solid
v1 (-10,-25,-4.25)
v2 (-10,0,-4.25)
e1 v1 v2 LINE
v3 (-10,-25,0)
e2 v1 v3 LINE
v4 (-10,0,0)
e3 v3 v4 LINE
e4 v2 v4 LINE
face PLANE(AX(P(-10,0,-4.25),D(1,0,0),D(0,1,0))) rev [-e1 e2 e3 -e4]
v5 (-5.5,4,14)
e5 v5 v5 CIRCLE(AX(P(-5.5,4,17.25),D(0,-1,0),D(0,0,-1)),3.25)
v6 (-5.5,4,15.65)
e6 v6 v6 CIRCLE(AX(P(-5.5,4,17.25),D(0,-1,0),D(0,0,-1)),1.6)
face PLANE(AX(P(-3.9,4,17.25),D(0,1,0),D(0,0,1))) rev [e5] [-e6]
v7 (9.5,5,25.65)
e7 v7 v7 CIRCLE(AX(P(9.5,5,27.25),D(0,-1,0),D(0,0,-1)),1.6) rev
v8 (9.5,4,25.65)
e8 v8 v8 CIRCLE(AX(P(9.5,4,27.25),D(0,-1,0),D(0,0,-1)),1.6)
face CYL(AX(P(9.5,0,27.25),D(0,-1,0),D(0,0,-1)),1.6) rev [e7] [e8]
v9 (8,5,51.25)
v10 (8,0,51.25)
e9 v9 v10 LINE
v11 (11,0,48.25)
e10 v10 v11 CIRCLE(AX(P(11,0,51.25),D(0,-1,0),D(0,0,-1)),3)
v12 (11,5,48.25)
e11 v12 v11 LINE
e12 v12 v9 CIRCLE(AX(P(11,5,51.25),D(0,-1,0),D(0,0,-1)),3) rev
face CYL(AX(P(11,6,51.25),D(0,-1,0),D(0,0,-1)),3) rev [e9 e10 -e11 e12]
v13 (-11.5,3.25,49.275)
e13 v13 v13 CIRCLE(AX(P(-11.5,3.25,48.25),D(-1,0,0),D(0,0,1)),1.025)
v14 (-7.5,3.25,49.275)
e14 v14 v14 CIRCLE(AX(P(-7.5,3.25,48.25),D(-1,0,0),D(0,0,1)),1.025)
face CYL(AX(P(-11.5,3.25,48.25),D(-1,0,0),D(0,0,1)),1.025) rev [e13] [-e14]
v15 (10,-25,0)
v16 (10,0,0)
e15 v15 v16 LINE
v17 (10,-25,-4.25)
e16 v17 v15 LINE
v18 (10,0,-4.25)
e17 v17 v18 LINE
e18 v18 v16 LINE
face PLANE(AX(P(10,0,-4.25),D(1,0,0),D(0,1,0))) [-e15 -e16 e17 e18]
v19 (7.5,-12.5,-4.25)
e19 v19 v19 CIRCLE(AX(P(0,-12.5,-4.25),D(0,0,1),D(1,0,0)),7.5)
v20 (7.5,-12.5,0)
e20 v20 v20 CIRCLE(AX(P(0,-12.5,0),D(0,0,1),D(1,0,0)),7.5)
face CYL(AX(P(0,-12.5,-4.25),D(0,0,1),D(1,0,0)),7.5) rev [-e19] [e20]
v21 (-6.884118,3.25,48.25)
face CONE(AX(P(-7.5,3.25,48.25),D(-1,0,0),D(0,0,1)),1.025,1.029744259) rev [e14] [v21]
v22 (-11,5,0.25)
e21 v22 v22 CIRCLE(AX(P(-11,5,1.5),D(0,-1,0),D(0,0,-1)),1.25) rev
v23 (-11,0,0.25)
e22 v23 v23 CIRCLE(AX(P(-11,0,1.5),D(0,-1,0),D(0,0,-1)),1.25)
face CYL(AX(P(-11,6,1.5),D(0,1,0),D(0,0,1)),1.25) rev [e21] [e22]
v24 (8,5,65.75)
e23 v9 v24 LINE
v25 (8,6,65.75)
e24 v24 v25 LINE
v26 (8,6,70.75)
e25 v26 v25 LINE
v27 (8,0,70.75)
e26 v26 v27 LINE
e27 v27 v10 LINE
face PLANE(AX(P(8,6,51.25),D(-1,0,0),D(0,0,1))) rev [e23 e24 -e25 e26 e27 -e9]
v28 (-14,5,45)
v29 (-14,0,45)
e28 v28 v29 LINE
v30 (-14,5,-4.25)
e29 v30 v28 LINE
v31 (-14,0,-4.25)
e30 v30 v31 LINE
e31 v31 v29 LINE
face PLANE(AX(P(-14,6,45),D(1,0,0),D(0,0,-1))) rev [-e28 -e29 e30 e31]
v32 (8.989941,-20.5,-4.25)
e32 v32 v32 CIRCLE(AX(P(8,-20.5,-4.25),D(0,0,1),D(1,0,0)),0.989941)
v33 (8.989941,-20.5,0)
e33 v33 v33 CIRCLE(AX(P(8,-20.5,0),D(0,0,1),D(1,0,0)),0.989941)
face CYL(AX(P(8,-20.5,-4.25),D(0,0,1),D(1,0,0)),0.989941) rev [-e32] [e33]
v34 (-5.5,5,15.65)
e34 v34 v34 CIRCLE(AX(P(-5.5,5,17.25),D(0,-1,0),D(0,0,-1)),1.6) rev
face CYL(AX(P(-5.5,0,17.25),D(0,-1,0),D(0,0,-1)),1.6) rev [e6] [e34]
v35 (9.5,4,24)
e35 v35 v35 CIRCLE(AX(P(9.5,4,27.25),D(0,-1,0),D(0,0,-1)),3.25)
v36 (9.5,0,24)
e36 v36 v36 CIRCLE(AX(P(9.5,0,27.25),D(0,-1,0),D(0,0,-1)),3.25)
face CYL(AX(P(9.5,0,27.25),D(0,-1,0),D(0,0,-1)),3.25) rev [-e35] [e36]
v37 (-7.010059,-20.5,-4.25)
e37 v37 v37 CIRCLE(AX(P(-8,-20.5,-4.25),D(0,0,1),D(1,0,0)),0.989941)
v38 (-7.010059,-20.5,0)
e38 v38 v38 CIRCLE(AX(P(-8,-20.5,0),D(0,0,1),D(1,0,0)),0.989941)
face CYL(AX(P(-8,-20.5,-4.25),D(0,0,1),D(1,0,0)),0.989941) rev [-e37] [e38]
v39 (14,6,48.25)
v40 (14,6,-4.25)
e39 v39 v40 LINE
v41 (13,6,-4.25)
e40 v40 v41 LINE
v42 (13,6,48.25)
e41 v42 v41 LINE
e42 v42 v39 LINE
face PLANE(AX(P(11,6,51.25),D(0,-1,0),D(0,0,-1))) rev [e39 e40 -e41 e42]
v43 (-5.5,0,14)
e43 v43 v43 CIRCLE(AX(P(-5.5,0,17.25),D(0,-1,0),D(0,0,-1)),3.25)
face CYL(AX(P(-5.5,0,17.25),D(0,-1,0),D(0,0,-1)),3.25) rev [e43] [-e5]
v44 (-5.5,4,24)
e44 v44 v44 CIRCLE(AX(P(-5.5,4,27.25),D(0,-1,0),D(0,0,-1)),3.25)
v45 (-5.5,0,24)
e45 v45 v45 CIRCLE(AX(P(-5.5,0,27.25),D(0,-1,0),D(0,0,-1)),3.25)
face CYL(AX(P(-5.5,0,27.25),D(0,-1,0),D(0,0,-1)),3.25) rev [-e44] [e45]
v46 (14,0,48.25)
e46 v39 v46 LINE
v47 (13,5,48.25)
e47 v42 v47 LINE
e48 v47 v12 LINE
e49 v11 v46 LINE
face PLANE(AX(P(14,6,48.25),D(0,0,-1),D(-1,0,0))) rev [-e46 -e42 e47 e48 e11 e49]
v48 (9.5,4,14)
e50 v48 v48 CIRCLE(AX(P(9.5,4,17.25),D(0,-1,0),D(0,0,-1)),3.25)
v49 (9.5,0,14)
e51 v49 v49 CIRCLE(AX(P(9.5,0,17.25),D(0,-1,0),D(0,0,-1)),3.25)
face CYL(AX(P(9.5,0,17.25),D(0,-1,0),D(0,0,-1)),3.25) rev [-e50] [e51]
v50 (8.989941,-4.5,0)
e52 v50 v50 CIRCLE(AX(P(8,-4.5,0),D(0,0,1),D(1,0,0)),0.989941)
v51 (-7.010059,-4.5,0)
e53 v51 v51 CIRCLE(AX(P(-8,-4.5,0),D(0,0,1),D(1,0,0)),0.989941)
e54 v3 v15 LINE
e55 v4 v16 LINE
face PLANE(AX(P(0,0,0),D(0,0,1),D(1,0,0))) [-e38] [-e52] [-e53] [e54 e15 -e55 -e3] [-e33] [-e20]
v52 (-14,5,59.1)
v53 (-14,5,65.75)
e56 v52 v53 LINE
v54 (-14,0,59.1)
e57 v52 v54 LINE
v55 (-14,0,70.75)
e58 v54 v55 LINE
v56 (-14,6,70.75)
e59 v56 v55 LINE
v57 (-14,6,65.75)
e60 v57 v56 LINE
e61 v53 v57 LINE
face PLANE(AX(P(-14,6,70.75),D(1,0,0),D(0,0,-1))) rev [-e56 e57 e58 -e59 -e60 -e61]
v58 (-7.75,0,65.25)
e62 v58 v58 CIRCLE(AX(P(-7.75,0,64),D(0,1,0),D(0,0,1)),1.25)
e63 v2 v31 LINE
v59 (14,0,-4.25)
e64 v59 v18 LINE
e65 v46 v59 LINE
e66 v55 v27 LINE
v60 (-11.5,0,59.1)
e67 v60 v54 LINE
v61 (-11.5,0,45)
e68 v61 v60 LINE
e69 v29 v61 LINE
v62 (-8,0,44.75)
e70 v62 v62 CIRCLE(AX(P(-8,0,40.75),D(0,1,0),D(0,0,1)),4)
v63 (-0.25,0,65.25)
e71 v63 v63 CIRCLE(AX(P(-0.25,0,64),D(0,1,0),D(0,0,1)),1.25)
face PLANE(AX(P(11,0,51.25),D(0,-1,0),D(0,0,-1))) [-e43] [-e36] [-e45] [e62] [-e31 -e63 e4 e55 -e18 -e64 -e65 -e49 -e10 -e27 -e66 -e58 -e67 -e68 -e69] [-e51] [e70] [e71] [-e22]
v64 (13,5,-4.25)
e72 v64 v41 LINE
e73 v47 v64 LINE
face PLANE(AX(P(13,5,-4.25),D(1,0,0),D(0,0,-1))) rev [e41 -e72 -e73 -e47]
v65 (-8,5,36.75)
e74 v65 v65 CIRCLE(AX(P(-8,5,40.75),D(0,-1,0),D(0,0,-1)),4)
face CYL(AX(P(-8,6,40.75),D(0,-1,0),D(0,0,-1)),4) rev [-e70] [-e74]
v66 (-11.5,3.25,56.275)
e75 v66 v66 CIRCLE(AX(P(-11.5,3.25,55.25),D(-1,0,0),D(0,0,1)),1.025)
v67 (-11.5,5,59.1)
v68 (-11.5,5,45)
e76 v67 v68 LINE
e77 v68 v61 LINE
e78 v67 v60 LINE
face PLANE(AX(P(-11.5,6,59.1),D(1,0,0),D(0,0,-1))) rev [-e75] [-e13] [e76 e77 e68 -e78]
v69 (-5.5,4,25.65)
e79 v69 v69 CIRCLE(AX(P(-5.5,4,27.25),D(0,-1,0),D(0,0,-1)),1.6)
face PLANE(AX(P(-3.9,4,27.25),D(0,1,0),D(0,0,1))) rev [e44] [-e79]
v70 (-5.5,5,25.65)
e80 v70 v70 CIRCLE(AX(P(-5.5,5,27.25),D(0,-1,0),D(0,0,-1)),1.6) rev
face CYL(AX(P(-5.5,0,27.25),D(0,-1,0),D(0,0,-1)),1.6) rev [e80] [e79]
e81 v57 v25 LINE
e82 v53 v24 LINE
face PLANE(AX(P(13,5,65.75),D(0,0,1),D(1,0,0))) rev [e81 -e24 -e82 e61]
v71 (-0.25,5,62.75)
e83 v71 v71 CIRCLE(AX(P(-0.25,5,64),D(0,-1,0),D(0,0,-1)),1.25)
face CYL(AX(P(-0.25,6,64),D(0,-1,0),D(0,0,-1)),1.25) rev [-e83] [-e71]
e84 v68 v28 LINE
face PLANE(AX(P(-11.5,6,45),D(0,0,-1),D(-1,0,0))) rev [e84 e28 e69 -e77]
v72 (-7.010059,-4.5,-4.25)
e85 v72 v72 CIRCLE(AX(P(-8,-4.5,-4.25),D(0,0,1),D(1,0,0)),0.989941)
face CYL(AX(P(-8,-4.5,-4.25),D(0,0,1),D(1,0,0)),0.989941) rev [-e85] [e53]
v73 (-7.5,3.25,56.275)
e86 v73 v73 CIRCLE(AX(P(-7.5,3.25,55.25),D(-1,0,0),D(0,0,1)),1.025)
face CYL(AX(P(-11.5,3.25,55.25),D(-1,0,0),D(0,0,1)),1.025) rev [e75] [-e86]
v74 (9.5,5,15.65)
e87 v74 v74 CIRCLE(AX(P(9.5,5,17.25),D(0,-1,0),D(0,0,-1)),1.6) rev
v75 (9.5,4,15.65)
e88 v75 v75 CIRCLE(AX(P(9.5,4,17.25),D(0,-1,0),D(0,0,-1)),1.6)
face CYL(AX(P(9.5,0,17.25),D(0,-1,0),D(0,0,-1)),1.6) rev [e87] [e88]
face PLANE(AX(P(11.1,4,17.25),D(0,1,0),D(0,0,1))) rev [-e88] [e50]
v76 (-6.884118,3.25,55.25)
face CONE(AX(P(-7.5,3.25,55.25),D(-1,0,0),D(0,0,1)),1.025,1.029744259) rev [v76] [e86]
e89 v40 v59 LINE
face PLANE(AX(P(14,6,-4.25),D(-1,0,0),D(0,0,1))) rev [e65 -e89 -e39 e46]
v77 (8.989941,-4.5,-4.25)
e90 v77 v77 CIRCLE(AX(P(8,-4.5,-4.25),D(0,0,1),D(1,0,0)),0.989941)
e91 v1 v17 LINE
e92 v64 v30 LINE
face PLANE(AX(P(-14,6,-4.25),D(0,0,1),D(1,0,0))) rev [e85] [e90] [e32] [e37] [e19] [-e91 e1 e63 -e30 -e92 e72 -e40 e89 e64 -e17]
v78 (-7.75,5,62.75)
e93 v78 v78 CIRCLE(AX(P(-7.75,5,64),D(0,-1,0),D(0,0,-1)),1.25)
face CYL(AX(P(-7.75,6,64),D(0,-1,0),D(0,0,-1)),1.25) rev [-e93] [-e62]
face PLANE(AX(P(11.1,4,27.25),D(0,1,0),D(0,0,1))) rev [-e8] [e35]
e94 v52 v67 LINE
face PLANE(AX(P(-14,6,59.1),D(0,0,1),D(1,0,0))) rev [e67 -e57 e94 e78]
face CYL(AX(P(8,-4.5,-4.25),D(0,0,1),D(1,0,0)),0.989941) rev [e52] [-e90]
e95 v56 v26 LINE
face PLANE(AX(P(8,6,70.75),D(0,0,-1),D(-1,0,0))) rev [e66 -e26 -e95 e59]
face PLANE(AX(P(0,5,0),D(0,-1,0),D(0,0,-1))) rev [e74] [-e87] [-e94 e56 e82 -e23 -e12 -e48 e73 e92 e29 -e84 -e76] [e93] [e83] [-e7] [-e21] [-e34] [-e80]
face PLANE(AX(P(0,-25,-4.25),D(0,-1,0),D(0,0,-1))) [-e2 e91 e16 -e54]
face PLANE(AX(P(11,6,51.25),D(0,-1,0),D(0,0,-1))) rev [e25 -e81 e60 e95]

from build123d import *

# Parameters (mm, degrees)
BACK_SKETCH_R                                  = 0.8
BACK_SKETCH_R_2                                = 4
BACK_SKETCH_R_3                                = 1.25
BACK_EXTRUDE_DEPTH                             = 6
BOTTOM_SKETCH_W                                = 20
BOTTOM_SKETCH_H                                = 25
BOTTOM_SKETCH_R                                = 0.989941464
BOTTOM_SKETCH_R_2                              = 7.5
BOTTOM_EXTRUDE_DEPTH                           = 4.25
CARRAIGE_MOUNT_M3S_D                           = 3.2
CARRAIGE_MOUNT_M3S_CBORE_D                     = 6.5
CARRAIGE_MOUNT_M3S_CBORE_DEPTH                 = 4
ROTATIONAL_SENSOR_TAPPED_HOLES_M2_5X0_45_D     = 2.05
ROTATIONAL_SENSOR_TAPPED_HOLES_M2_5X0_45_DEPTH = 4
ROTATIONAL_SENSOR_TAPPED_HOLES_M2_5X0_45_TIP   = 0.615882135
M3X0_5_TAPPED_HOLE1_D                          = 2.5
SKETCH5_W                                      = 27
SKETCH5_H                                      = 70
BACK_RECESS_CUT_DEPTH                          = 1


with BuildPart() as part:
    # Back Sketch → Back Extrude (new body)
    with BuildSketch(Plane(origin=(0, 0, 0), x_dir=(1, 0, 0), z_dir=(0, 1, 0))):
        with BuildLine():
            Line((14, 4.25), (14, -48.25))
            Line((14, -48.25), (11, -48.25))
            ThreePointArc((11, -48.25), (8.878679656, -49.128679656), (8, -51.25))
            Line((8, -51.25), (8, -70.75))
            Line((8, -70.75), (-14, -70.75))
            Line((-14, -70.75), (-14, -59.1))
            Line((-14, -59.1), (-11.5, -59.1))
            Line((-11.5, -59.1), (-11.5, -45))
            Line((-11.5, -45), (-14, -45))
            Line((-14, -45), (-14, 4.25))
            Line((-14, 4.25), (14, 4.25))
        make_face()
        with Locations((9.5, -17.25)):
            Circle(BACK_SKETCH_R, mode=Mode.SUBTRACT)
        with Locations((-5.5, -17.25)):
            Circle(BACK_SKETCH_R, mode=Mode.SUBTRACT)
        with Locations((-5.5, -27.25)):
            Circle(BACK_SKETCH_R, mode=Mode.SUBTRACT)
        with Locations((9.5, -27.25)):
            Circle(BACK_SKETCH_R, mode=Mode.SUBTRACT)
        with Locations((-8, -40.75)):
            Circle(BACK_SKETCH_R_2, mode=Mode.SUBTRACT)
        with Locations((-7.75, -64)):
            Circle(BACK_SKETCH_R_3, mode=Mode.SUBTRACT)
        with Locations((-0.25, -64)):
            Circle(BACK_SKETCH_R_3, mode=Mode.SUBTRACT)
    extrude(amount=BACK_EXTRUDE_DEPTH)

    # Bottom Sketch → Bottom Extrude (add)
    with BuildSketch(Plane.XY):
        with Locations((0, -12.5)):
            Rectangle(BOTTOM_SKETCH_W, BOTTOM_SKETCH_H)
        with Locations((-8, -20.5)):
            Circle(BOTTOM_SKETCH_R, mode=Mode.SUBTRACT)
        with Locations((8, -20.5)):
            Circle(BOTTOM_SKETCH_R, mode=Mode.SUBTRACT)
        with Locations((-8, -4.5)):
            Circle(BOTTOM_SKETCH_R, mode=Mode.SUBTRACT)
        with Locations((0, -12.5)):
            Circle(BOTTOM_SKETCH_R_2, mode=Mode.SUBTRACT)
        with Locations((8, -4.5)):
            Circle(BOTTOM_SKETCH_R, mode=Mode.SUBTRACT)
    extrude(amount=-BOTTOM_EXTRUDE_DEPTH)

    # Carraige Mount  M3s (through all)
    with Locations(Plane(origin=(9.5, 0, 27.25), x_dir=(0, 0, -1), z_dir=(0, -1, 0))):
        with Locations((0, 0), (0, -15), (10, -15), (10, 0)):
            CounterBoreHole(CARRAIGE_MOUNT_M3S_D / 2, CARRAIGE_MOUNT_M3S_CBORE_D / 2, CARRAIGE_MOUNT_M3S_CBORE_DEPTH)

    # Rotational Sensor Tapped Holes M2.5x0.45 Tapped Holes
    with Locations(Plane.ZY.offset(11.5)):
        with Locations((55.25, 3.25), (48.25, 3.25)):
            Hole(ROTATIONAL_SENSOR_TAPPED_HOLES_M2_5X0_45_D / 2, depth=ROTATIONAL_SENSOR_TAPPED_HOLES_M2_5X0_45_DEPTH)
            with Locations((0, 0, -(ROTATIONAL_SENSOR_TAPPED_HOLES_M2_5X0_45_DEPTH + ROTATIONAL_SENSOR_TAPPED_HOLES_M2_5X0_45_TIP / 2))):  # 118° drill point
                Cone(0, ROTATIONAL_SENSOR_TAPPED_HOLES_M2_5X0_45_D / 2, ROTATIONAL_SENSOR_TAPPED_HOLES_M2_5X0_45_TIP, mode=Mode.SUBTRACT)

    # M3x0.5 Tapped Hole1 (through all)
    with Locations(Plane(origin=(0, 6, 0), x_dir=(1, 0, 0), z_dir=(0, 1, 0))):
        with Locations((-11, -1.5)):
            Hole(M3X0_5_TAPPED_HOLE1_D / 2)

    # Sketch5 → Back Recess Cut (cut)
    with BuildSketch(Plane(origin=(0, 6, 0), x_dir=(1, 0, 0), z_dir=(0, 1, 0))):
        with Locations((-0.5, -30.75)):
            Rectangle(SKETCH5_W, SKETCH5_H)
    extrude(amount=-BACK_RECESS_CUT_DEPTH, mode=Mode.SUBTRACT)


solid = part.part
